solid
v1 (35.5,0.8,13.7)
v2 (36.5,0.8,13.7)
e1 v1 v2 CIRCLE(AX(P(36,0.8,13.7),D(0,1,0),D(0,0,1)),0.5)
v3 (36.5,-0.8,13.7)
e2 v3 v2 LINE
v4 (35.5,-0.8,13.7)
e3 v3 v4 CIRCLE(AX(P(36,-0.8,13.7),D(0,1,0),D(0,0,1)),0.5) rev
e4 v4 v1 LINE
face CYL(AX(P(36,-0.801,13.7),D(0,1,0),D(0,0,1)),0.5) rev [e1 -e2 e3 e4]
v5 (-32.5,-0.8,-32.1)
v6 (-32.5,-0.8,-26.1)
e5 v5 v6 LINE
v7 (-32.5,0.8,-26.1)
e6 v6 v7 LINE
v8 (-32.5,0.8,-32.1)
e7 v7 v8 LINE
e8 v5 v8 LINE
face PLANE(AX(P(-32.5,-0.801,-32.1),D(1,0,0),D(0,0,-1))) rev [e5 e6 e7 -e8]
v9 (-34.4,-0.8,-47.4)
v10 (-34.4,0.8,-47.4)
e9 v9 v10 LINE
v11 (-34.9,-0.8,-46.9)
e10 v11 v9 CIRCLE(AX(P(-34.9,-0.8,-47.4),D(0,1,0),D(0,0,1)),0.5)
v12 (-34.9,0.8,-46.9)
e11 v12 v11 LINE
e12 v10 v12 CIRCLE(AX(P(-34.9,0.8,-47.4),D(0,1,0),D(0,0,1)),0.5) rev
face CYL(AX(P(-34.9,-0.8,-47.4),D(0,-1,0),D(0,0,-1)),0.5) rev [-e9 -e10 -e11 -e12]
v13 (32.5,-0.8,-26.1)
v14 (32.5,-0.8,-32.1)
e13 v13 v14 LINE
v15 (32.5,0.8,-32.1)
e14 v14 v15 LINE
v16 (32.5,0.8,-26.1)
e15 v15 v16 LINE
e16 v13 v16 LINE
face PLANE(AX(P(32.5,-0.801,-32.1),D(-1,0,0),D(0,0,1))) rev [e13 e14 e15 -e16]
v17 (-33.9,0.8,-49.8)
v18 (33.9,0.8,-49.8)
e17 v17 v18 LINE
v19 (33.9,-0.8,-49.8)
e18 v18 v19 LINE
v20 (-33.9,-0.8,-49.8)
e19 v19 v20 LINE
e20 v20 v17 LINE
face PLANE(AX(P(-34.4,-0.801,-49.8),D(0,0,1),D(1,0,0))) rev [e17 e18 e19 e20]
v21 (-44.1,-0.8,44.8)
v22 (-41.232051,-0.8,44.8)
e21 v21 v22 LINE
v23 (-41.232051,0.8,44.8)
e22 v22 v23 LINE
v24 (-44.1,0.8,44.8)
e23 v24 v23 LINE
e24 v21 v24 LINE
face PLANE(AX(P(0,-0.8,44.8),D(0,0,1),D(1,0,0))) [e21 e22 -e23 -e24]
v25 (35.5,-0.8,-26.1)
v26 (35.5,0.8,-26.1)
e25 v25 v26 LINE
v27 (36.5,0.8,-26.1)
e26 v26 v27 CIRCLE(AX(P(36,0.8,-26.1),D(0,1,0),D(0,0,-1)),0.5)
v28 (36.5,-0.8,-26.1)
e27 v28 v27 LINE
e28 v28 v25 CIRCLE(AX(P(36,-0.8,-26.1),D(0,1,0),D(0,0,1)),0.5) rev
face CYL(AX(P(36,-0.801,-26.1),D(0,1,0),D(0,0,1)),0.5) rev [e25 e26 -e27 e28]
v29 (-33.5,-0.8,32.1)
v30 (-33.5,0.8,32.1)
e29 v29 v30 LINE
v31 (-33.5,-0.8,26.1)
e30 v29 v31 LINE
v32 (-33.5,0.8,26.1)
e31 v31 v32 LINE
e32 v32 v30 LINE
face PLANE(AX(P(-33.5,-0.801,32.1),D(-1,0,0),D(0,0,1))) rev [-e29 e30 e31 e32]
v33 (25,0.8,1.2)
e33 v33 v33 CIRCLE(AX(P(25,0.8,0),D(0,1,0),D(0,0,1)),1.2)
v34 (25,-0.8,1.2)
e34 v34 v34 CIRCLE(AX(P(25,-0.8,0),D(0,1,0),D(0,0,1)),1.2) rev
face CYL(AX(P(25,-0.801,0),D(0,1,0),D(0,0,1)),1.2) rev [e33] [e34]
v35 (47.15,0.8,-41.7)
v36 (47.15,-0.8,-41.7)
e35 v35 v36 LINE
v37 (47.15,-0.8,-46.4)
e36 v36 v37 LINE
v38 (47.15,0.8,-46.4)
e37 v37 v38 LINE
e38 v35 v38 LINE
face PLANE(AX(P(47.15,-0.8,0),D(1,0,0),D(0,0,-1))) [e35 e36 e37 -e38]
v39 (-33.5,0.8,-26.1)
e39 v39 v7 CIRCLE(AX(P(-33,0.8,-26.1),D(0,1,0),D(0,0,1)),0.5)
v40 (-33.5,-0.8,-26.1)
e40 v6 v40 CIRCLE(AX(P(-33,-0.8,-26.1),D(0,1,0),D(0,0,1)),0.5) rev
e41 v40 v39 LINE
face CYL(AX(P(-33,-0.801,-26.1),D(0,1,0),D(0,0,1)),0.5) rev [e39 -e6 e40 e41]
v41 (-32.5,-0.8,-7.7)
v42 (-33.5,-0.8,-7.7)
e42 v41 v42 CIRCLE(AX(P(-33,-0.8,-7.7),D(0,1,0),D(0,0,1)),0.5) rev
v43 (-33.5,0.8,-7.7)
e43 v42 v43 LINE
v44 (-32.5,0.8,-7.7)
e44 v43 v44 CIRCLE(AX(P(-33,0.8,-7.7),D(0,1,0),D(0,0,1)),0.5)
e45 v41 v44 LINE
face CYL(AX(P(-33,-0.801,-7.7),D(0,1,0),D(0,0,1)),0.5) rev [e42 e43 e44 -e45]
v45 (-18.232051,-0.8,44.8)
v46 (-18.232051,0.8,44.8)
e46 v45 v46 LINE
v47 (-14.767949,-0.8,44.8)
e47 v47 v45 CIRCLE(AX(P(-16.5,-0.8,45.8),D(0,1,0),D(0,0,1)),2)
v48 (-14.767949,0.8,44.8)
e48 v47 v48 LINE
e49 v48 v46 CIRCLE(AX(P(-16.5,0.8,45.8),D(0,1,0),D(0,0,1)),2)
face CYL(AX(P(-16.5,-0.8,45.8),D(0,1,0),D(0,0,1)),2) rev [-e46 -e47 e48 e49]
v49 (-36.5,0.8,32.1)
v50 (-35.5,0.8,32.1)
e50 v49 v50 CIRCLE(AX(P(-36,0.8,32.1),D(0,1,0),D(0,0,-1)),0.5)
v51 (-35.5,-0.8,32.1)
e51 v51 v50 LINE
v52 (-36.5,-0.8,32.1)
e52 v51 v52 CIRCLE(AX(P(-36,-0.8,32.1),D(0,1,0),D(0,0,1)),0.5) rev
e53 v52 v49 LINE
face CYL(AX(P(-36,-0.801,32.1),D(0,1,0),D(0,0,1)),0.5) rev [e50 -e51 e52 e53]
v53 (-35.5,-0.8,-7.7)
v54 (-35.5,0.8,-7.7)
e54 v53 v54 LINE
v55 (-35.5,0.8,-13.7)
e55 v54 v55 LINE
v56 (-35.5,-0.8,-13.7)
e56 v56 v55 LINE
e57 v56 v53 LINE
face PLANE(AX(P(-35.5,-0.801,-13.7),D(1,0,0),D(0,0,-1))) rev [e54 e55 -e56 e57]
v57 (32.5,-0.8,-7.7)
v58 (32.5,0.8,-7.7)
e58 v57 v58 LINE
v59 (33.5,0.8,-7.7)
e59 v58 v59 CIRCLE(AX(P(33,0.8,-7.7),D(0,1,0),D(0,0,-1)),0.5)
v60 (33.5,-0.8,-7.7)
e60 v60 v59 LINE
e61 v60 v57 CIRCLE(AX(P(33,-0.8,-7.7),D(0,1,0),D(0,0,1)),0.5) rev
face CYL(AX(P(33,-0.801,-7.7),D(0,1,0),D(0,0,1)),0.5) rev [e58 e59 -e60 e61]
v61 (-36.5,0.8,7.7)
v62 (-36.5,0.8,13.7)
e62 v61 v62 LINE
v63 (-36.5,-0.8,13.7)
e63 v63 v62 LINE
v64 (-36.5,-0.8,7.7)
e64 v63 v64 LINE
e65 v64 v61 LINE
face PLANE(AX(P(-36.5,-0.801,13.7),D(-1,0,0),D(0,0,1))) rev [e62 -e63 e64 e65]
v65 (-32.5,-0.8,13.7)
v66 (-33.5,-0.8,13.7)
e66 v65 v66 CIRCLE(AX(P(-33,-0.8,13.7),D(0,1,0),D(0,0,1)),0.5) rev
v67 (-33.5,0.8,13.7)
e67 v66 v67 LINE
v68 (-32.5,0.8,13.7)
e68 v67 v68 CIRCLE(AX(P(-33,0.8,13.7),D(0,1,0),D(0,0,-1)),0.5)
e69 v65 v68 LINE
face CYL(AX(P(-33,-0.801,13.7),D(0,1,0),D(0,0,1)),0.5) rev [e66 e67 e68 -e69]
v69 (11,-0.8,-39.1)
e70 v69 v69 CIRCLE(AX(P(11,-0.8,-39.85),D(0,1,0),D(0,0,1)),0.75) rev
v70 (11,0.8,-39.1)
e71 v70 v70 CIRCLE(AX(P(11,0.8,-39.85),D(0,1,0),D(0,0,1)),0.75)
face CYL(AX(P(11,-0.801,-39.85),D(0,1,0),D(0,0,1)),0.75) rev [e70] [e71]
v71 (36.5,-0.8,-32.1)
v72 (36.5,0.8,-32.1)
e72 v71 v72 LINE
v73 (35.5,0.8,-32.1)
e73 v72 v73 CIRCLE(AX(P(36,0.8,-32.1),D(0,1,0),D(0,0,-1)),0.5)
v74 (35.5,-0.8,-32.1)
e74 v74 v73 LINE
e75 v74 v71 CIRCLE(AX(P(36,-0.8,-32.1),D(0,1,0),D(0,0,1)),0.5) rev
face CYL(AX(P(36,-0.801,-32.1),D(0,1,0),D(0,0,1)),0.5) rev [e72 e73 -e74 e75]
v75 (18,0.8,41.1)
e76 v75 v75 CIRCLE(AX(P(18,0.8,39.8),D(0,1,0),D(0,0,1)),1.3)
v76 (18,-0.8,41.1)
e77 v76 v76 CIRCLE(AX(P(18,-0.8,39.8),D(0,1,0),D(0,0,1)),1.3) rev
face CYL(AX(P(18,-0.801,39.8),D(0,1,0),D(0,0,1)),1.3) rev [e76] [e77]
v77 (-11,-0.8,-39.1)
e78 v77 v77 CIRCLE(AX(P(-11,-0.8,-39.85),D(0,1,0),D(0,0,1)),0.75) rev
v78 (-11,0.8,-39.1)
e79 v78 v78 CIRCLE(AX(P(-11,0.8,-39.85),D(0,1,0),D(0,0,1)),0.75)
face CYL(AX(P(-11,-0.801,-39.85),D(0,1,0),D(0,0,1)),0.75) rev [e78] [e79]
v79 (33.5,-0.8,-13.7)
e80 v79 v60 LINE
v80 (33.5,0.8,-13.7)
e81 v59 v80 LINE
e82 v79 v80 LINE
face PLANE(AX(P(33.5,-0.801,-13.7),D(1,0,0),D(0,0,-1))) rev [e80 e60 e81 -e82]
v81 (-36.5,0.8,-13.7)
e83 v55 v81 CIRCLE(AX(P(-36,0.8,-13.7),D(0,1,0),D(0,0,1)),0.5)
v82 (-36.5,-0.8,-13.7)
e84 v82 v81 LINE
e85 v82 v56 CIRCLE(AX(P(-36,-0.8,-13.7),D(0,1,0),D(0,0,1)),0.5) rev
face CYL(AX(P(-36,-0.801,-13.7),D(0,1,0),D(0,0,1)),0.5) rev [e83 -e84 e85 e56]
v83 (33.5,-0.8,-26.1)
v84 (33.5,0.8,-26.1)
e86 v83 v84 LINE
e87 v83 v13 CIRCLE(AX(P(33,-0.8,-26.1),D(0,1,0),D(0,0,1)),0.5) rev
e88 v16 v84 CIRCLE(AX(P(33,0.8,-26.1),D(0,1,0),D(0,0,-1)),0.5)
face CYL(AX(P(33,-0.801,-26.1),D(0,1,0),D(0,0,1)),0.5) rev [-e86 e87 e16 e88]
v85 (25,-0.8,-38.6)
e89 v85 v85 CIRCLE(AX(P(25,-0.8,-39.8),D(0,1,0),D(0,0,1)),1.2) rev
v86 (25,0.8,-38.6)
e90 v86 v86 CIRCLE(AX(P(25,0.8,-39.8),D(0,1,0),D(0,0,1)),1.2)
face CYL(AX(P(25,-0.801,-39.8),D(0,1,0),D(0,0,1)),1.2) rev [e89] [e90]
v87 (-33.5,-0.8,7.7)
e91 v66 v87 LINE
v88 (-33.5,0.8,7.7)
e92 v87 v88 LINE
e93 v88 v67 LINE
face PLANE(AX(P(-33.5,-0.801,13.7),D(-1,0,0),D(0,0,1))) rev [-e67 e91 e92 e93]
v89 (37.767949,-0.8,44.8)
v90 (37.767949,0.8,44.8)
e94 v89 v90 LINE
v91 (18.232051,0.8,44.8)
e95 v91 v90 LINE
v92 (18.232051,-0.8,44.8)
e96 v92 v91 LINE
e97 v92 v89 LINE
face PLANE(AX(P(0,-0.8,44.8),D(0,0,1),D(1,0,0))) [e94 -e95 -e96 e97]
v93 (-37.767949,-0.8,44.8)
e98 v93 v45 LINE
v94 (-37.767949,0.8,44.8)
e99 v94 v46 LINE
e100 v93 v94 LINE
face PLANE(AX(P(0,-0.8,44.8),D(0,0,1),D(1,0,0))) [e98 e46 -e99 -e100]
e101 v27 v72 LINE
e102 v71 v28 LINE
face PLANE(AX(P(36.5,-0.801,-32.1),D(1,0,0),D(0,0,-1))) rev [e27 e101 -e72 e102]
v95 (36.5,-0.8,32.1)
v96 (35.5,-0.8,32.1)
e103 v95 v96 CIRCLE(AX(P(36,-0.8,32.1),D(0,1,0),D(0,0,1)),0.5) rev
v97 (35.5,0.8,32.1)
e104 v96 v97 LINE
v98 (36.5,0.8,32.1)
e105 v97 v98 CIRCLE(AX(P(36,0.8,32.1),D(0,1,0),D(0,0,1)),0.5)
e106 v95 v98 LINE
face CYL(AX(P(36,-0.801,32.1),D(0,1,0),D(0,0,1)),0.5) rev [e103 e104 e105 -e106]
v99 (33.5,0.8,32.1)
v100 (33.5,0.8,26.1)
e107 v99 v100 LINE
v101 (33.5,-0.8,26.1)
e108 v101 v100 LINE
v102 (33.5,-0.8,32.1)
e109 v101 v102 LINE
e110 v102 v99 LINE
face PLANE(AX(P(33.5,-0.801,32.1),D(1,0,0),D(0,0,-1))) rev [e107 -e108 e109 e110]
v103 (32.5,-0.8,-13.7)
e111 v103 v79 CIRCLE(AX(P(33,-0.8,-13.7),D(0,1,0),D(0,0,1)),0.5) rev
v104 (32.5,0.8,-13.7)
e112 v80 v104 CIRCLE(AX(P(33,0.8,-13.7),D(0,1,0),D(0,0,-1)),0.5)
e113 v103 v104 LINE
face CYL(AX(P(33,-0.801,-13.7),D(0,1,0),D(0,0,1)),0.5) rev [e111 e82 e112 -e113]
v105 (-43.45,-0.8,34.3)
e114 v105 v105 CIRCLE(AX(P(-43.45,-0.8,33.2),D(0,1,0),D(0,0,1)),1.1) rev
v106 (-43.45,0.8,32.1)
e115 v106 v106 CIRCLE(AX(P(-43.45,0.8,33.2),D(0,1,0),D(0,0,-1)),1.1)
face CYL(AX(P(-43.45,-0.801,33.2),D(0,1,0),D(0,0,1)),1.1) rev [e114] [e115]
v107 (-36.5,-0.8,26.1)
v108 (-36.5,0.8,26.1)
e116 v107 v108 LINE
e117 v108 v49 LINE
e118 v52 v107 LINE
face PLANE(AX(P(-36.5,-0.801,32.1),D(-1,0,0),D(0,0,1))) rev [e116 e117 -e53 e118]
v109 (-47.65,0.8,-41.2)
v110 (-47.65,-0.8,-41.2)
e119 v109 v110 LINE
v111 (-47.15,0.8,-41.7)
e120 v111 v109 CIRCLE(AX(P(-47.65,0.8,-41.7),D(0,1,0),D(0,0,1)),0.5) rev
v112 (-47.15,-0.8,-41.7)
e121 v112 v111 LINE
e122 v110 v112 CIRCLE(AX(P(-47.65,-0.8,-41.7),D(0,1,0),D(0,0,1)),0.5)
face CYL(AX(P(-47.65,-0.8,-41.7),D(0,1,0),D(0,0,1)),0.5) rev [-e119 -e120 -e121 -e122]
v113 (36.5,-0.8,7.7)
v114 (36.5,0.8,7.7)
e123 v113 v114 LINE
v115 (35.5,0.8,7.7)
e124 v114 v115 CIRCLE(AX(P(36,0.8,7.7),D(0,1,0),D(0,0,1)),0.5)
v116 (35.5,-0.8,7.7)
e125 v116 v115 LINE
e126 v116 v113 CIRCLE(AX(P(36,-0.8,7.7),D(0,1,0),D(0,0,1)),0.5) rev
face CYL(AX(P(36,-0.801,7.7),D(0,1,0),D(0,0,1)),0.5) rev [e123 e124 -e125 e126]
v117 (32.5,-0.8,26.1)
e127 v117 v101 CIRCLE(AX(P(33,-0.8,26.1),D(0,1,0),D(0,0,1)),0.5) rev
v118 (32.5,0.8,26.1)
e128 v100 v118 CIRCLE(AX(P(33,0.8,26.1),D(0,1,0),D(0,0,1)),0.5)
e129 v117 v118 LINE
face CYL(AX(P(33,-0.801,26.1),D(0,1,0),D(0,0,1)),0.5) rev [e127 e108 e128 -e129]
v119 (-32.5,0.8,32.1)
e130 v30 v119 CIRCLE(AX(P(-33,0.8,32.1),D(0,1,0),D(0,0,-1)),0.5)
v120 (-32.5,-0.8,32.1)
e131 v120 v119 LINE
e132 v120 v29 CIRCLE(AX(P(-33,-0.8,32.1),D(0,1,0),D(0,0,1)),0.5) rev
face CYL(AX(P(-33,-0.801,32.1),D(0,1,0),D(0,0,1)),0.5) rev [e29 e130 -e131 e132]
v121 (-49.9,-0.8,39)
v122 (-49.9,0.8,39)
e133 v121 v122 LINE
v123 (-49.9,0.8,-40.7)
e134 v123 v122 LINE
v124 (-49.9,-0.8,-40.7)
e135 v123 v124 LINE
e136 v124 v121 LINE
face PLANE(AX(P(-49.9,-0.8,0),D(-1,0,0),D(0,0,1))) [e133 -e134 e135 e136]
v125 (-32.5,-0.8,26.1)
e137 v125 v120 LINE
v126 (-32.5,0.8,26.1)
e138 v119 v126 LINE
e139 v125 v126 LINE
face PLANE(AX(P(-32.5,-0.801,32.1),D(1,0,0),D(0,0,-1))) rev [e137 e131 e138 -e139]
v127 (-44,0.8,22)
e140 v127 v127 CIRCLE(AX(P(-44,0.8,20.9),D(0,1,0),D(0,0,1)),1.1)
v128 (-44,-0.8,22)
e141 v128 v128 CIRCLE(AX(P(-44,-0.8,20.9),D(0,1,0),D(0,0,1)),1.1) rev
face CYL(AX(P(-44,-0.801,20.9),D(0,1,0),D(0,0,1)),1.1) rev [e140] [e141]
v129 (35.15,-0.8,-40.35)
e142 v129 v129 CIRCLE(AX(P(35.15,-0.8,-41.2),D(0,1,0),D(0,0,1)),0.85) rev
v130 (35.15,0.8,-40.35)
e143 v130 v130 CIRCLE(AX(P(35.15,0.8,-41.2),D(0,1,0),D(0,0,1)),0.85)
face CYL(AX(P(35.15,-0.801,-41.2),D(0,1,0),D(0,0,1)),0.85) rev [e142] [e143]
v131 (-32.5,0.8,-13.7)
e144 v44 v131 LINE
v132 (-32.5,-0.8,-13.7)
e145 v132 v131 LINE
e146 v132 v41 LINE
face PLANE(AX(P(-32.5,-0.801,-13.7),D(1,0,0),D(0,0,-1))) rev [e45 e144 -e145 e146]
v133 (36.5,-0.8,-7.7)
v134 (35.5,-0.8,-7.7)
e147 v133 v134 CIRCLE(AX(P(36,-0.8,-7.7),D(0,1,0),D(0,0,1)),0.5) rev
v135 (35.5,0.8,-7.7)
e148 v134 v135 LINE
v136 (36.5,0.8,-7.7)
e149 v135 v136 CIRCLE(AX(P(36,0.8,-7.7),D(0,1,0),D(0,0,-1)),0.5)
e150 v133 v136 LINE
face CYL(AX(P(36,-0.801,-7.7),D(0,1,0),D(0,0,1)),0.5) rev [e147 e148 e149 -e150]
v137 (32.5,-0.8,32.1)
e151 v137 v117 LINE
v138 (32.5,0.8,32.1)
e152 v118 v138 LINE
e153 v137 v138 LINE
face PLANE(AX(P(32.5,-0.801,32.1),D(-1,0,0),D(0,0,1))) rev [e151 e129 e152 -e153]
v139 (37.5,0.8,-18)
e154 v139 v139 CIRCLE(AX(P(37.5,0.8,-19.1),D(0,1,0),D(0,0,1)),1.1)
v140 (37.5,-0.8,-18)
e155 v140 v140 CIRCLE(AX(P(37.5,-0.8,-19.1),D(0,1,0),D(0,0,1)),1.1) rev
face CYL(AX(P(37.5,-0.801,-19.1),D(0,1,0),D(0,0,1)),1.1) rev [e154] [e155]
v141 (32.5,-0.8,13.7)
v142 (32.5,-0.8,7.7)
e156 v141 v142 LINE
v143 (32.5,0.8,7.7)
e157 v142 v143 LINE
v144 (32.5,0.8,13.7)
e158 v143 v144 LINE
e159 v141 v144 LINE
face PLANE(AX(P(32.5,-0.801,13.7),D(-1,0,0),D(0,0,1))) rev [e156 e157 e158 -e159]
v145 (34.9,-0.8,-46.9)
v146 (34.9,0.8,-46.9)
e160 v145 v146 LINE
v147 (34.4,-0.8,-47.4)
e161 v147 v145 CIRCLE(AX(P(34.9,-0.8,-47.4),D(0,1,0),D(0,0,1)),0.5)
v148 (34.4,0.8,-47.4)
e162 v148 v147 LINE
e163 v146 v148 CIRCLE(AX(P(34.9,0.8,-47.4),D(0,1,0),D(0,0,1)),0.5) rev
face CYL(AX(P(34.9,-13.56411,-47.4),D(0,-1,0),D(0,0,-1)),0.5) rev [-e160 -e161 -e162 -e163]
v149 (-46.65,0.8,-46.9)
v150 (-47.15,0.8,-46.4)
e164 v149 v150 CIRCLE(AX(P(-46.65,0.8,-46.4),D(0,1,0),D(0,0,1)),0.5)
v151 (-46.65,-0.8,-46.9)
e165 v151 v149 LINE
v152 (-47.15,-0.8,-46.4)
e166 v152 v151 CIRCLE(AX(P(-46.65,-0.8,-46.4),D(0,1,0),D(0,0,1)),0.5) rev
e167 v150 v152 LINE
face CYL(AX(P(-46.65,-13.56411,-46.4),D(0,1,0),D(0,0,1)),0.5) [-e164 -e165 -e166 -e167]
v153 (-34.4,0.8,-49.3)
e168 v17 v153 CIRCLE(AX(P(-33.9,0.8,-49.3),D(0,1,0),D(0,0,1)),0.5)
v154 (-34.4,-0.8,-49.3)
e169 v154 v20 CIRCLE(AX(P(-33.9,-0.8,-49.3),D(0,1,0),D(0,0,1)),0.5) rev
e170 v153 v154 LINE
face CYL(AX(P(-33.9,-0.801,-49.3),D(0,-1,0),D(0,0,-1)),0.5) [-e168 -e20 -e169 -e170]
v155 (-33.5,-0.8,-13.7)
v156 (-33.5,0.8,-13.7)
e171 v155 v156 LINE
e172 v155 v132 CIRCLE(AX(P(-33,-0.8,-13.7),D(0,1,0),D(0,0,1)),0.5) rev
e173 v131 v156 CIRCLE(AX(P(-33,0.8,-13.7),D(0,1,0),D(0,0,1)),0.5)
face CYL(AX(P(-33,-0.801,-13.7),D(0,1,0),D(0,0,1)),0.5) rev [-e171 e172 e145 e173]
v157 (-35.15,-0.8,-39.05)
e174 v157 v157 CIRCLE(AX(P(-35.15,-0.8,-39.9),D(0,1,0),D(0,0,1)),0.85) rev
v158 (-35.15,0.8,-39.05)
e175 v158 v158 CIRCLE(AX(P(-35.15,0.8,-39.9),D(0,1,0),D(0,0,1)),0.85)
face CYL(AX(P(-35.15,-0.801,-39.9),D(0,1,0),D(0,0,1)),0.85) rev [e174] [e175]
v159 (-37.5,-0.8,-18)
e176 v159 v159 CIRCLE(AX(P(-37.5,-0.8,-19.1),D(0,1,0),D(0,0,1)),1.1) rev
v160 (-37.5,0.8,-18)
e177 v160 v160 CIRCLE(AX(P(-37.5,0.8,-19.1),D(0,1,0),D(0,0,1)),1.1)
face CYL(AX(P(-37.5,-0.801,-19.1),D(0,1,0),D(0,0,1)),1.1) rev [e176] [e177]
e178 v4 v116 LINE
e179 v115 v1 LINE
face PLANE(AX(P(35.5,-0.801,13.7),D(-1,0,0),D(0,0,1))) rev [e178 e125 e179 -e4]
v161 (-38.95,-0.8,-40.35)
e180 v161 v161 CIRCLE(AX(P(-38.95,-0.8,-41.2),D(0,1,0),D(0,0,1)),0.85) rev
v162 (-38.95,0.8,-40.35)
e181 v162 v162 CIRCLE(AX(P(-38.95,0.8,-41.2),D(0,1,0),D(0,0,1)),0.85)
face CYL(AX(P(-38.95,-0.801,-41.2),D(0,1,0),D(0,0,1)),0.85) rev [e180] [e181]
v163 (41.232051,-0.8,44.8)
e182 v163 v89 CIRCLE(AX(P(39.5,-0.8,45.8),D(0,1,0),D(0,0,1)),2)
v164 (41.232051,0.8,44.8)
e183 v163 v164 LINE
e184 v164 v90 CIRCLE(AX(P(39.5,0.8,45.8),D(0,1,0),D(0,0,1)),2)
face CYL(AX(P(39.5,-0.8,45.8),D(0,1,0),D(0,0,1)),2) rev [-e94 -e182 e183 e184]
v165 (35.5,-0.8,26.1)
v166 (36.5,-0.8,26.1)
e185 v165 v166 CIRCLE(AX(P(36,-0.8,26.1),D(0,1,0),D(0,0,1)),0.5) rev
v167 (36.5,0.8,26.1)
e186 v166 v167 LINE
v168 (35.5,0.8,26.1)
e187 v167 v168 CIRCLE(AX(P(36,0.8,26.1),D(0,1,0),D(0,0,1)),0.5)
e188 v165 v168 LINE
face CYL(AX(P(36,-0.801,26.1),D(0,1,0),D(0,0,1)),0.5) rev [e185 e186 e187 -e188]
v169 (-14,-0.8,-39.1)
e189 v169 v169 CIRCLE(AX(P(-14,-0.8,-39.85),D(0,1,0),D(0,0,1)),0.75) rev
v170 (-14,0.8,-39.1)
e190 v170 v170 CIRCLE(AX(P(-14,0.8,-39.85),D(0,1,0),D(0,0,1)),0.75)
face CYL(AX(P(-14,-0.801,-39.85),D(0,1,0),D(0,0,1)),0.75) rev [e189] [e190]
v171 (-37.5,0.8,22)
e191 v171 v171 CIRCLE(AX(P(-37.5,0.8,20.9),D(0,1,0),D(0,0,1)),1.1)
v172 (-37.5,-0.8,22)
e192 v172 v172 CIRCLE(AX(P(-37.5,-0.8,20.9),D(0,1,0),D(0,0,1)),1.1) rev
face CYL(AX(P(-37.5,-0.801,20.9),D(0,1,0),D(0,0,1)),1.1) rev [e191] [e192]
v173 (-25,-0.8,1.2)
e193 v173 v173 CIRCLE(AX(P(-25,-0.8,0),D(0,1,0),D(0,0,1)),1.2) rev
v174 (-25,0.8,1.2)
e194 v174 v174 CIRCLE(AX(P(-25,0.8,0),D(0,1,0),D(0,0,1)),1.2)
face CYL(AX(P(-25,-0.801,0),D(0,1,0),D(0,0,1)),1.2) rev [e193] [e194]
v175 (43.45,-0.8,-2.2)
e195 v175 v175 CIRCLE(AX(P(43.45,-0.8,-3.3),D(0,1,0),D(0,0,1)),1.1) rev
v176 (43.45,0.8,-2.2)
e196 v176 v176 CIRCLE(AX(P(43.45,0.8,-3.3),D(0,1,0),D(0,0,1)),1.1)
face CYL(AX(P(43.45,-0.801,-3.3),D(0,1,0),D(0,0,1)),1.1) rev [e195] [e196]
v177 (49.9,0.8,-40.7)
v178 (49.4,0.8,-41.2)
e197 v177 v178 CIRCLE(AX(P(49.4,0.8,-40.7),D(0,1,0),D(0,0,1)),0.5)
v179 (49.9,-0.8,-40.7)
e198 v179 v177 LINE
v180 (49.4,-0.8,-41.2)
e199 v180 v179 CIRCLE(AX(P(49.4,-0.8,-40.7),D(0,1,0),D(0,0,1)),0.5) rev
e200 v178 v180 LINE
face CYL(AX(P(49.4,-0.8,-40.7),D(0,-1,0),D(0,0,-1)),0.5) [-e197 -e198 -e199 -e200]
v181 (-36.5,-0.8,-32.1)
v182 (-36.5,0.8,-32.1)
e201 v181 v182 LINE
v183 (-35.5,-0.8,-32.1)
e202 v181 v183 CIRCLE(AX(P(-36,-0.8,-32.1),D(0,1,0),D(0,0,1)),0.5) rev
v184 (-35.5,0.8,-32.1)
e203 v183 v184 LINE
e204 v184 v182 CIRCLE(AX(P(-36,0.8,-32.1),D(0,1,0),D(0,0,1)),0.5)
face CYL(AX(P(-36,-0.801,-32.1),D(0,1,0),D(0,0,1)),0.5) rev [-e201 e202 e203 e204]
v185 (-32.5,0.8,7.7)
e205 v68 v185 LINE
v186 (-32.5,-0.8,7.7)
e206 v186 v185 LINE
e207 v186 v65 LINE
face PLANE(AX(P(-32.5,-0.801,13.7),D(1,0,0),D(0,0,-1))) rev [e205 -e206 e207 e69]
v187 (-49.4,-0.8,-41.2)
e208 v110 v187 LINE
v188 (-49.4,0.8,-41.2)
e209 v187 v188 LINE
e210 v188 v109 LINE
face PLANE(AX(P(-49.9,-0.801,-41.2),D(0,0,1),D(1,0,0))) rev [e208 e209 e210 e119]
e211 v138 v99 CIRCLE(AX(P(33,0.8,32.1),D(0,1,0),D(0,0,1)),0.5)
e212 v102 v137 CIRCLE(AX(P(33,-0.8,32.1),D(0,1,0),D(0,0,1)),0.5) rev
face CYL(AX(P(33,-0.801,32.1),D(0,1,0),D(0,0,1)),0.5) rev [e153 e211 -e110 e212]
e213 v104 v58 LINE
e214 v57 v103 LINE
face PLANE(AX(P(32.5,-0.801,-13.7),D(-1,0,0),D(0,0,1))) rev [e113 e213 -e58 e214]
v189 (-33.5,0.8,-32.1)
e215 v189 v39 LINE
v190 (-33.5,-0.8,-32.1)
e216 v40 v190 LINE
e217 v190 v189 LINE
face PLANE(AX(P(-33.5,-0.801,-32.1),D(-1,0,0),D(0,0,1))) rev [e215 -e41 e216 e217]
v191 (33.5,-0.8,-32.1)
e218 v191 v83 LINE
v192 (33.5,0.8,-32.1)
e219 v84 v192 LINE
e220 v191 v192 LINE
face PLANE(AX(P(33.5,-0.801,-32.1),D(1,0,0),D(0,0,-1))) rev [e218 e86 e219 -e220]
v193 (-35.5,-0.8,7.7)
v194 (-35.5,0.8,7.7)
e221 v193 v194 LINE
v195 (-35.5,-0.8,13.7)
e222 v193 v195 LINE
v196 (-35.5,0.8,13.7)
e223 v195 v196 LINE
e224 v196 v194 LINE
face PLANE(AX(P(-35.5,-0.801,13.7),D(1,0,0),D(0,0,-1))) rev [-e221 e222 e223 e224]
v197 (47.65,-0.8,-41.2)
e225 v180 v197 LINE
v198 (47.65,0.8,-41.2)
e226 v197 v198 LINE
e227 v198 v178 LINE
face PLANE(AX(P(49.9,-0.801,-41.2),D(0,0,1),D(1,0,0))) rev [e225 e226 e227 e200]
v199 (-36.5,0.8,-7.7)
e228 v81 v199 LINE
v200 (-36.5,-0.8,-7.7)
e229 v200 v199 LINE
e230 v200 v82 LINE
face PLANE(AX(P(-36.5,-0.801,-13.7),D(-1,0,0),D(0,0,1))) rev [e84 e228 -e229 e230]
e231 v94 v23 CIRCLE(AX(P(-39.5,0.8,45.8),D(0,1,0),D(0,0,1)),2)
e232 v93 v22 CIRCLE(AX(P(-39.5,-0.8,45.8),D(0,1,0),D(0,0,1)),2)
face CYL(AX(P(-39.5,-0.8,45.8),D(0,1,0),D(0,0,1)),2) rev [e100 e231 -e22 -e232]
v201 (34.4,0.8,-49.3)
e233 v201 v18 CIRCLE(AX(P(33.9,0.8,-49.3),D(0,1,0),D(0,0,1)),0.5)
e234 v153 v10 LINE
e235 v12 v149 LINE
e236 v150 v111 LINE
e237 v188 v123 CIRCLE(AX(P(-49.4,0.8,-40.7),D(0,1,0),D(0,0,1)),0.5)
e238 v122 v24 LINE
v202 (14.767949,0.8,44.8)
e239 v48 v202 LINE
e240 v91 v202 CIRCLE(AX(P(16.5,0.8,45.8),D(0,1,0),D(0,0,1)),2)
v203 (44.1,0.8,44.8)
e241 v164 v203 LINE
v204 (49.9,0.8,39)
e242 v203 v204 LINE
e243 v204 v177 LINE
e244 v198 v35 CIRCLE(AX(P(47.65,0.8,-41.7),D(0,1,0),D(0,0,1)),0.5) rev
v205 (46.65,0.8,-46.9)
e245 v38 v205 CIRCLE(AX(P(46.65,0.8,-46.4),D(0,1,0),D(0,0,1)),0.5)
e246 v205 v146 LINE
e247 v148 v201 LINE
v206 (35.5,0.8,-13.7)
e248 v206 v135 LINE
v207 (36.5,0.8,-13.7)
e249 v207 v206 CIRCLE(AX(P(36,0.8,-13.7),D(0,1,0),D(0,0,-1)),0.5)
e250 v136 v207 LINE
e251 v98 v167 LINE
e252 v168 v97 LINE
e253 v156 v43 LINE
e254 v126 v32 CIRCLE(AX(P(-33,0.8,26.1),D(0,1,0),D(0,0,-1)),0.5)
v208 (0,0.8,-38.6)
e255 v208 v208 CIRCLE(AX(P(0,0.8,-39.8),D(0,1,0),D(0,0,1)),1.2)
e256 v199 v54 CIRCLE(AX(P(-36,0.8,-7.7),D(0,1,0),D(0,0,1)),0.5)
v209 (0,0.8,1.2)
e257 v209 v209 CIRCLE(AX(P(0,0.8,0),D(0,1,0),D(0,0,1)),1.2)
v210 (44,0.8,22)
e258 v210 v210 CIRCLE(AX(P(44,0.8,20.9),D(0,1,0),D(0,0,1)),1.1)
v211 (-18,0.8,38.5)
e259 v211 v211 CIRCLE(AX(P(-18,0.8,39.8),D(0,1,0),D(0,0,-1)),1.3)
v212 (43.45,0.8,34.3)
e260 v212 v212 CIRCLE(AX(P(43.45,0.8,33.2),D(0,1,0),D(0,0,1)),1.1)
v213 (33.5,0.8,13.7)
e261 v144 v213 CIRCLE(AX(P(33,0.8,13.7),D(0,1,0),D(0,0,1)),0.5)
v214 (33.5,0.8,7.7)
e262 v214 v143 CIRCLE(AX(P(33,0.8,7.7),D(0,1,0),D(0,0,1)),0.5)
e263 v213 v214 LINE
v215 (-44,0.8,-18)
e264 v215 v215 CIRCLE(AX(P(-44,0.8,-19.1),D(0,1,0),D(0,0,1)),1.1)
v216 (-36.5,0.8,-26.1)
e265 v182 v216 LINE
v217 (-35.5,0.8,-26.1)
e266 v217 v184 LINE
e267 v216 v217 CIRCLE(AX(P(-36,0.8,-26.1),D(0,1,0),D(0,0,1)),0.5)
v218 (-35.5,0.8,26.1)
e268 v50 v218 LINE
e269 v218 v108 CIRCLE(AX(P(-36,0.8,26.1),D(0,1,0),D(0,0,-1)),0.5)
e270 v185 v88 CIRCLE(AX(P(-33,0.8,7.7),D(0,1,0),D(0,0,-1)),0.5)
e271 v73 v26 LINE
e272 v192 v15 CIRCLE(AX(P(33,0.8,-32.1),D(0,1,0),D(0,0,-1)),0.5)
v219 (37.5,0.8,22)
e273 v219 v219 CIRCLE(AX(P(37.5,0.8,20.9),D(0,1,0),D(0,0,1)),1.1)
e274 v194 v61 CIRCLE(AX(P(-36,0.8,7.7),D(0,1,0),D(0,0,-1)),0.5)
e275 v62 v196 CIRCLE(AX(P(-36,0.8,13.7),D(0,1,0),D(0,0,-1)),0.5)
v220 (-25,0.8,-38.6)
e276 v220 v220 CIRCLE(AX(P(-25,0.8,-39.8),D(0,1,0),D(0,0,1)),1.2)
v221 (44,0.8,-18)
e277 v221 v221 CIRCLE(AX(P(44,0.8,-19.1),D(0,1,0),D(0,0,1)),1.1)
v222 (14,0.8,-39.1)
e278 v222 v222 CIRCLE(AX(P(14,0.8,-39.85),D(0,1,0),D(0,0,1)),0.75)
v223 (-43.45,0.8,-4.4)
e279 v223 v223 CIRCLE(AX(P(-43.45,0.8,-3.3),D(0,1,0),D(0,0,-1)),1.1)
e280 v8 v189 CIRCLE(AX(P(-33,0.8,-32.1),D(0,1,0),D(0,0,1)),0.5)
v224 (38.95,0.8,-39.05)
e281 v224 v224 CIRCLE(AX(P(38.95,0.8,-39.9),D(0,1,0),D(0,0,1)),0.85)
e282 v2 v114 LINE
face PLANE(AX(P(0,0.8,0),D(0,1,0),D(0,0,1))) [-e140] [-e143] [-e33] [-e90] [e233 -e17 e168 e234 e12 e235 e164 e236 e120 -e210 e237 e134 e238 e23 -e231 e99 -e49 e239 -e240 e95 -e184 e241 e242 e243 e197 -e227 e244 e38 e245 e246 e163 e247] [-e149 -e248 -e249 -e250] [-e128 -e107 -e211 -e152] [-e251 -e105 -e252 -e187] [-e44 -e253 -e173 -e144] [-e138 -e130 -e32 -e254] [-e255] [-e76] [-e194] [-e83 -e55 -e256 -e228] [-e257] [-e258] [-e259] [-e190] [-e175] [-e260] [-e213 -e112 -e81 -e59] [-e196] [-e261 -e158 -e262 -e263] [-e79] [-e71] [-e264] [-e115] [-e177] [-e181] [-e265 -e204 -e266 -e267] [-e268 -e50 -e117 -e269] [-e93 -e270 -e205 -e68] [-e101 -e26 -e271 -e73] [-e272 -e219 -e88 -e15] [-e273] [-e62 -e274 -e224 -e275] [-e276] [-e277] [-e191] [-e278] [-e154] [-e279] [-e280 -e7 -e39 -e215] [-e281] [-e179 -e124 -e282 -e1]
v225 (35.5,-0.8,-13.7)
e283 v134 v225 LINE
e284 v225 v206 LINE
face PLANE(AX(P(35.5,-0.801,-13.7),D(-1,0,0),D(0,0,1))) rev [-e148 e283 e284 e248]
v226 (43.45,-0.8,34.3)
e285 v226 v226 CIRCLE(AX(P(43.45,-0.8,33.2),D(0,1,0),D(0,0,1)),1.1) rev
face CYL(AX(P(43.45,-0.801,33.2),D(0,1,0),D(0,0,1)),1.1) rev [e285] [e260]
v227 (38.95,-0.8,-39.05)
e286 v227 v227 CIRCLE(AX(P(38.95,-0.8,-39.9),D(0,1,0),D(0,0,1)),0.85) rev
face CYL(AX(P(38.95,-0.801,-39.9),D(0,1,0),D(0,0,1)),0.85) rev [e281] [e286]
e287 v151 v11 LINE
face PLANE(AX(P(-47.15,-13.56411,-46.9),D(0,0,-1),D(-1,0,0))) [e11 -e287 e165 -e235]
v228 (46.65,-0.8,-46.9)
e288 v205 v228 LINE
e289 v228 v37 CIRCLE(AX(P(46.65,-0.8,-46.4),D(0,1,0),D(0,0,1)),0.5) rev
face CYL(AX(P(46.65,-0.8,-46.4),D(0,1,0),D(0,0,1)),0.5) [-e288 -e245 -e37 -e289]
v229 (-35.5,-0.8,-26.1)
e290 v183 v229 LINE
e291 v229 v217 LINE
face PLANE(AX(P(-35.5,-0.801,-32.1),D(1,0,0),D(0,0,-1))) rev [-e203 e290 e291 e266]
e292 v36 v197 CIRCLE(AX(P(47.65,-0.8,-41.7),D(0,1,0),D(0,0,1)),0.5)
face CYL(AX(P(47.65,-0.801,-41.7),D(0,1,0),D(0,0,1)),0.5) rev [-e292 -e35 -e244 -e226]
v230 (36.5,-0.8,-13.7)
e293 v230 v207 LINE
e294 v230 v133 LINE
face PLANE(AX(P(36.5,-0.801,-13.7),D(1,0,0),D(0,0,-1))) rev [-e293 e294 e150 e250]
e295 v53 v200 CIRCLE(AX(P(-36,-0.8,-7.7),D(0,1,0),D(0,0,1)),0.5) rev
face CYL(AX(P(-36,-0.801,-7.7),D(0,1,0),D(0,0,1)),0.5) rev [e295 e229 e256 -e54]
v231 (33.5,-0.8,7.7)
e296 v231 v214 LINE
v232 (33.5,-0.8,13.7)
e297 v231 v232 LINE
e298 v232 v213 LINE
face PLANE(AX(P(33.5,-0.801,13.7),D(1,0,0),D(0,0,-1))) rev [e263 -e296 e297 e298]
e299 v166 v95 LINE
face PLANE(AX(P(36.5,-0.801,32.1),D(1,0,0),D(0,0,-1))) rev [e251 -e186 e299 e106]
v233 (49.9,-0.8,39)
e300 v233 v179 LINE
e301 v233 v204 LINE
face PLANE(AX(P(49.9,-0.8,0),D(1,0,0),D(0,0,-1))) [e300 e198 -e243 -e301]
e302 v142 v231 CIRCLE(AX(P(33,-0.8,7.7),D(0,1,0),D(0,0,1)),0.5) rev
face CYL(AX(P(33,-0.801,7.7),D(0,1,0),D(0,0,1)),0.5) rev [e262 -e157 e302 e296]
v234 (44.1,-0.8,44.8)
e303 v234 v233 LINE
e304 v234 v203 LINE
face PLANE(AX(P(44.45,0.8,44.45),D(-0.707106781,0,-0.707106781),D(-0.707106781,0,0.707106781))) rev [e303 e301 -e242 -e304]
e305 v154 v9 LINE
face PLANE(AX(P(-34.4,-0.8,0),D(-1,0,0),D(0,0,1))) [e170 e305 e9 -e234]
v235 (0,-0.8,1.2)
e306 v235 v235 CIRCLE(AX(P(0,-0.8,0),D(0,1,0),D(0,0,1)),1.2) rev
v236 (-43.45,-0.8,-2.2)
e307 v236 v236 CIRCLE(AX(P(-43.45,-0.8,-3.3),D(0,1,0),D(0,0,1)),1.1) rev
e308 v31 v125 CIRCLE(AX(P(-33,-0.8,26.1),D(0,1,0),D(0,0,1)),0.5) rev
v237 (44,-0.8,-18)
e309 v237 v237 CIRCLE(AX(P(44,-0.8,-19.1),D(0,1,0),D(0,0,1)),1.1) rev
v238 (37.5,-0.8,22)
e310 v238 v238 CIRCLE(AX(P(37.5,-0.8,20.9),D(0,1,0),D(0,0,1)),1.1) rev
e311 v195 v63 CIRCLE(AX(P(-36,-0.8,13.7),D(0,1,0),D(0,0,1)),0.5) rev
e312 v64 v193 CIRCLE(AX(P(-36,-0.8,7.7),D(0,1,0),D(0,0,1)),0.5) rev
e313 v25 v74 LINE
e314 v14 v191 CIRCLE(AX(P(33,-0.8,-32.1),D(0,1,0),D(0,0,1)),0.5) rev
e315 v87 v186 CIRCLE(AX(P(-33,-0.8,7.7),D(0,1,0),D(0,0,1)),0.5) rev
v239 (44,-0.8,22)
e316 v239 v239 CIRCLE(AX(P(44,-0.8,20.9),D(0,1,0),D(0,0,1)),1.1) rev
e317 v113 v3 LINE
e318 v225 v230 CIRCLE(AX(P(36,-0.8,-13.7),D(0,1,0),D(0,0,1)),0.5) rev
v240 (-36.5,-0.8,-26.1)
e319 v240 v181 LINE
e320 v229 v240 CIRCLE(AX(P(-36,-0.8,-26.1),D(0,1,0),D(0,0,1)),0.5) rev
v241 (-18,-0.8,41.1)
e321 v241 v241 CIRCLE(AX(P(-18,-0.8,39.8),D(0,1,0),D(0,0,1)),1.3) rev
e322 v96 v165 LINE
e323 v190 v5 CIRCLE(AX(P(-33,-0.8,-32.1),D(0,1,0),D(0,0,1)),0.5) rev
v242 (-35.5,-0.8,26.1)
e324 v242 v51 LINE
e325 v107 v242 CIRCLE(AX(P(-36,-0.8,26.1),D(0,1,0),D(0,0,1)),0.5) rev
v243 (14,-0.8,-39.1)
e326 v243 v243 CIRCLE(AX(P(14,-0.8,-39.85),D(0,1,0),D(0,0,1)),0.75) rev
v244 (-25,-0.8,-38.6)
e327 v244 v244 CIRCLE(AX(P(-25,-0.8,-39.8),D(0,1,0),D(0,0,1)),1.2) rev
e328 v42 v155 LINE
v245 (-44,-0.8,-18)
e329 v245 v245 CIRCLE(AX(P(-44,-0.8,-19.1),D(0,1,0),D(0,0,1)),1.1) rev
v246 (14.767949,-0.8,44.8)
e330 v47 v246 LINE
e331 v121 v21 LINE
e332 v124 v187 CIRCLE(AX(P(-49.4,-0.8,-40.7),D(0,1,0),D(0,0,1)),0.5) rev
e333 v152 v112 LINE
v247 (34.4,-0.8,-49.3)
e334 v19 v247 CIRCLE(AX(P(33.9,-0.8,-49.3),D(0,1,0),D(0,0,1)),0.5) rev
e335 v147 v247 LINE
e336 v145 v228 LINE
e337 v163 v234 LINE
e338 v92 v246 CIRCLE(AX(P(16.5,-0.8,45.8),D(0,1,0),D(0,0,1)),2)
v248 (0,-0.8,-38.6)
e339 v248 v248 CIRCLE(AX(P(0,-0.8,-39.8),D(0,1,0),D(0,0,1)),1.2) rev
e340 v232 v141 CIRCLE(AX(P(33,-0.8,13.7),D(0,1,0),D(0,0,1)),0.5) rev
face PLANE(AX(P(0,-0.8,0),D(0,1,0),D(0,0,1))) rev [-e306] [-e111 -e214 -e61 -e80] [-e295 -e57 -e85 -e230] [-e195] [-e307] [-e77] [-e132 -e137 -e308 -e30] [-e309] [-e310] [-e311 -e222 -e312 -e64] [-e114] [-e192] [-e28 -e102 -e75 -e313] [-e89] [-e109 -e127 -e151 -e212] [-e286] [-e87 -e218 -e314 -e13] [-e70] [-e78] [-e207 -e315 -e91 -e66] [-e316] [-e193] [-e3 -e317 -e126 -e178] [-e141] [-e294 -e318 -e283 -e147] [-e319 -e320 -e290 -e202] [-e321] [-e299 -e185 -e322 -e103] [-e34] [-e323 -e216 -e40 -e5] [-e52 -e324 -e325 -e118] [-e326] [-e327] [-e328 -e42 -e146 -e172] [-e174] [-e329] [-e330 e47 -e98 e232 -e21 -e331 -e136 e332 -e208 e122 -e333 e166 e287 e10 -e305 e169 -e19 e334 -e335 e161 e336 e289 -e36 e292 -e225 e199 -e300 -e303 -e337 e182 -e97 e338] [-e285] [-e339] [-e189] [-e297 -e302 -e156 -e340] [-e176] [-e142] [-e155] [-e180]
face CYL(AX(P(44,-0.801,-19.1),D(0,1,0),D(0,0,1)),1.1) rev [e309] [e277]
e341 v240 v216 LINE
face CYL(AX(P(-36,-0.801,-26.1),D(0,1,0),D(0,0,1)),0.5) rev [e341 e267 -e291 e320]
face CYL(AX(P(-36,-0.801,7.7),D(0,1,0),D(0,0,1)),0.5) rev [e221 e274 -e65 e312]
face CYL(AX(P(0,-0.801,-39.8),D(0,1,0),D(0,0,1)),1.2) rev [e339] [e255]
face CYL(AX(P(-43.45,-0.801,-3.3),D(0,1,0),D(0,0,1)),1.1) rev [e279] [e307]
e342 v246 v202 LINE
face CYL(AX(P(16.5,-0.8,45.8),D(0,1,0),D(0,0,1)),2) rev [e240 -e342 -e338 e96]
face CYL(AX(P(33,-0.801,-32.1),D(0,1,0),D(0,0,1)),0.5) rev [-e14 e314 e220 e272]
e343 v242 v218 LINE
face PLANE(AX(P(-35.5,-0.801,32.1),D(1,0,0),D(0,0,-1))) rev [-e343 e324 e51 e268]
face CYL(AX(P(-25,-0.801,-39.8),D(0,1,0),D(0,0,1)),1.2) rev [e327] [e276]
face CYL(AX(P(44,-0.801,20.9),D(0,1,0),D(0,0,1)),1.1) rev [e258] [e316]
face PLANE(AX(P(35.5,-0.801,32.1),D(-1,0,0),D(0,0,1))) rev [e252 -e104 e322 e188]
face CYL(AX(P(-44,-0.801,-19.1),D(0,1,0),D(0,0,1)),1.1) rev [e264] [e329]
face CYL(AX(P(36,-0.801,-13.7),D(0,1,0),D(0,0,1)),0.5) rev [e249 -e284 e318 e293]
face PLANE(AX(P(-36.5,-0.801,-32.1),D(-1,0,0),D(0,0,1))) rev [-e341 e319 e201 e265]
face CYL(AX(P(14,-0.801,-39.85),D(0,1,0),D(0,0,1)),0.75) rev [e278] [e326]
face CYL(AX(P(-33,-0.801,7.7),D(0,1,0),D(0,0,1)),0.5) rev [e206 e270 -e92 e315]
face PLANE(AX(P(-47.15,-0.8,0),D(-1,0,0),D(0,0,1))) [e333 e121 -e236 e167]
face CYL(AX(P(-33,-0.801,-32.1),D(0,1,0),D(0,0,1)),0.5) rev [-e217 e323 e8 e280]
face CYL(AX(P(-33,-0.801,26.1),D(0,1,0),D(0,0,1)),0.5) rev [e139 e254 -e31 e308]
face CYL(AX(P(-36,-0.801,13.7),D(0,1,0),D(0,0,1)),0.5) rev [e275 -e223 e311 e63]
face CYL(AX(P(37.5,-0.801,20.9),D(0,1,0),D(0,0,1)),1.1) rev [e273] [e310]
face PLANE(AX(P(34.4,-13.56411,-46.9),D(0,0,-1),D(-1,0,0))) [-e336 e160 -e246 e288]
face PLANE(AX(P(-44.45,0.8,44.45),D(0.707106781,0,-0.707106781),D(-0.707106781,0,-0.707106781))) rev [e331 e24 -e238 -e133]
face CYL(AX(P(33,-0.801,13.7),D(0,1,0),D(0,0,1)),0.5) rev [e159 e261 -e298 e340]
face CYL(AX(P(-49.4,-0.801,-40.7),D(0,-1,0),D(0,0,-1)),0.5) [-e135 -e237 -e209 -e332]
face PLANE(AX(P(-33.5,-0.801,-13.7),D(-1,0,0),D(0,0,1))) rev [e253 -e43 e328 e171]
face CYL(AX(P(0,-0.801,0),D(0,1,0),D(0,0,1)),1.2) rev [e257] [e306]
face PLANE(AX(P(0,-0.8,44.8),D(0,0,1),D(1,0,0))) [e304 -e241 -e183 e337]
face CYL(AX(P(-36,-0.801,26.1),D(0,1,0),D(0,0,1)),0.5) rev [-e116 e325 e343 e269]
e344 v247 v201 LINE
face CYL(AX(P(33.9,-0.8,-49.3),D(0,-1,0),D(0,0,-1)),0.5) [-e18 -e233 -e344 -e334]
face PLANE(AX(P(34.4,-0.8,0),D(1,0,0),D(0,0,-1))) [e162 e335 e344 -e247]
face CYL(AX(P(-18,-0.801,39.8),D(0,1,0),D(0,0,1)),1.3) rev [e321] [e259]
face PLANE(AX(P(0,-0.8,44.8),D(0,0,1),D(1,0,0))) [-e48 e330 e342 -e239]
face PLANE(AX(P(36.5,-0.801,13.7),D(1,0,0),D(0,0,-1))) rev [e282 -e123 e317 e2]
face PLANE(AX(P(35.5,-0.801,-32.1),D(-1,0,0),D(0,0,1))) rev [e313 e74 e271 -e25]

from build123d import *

# Parameters (mm, degrees)
GENERICCARDPCBDEFINITION_START = -0.8
GENERICCARDPCBDEFINITION_DEPTH = 1.6
SKETCH7_R                      = 1.1
SKETCH7_R_2                    = 1.2
SKETCH7_R_3                    = 1.3
SKETCH7_R_4                    = 0.85
SKETCH7_R_5                    = 0.75
CUT_EXTRUDE1_DEPTH             = 1.6


# Read off the part's stored shape, not the designer's step: GenericCardPCBDefinition
with BuildPart() as part:
    # GenericCardPCBDefinition outline → GenericCardPCBDefinition (new body)
    with BuildSketch(Plane(origin=(0, 0, 0), x_dir=(1, 0, 0), z_dir=(0, 1, 0)).offset(GENERICCARDPCBDEFINITION_START)):
        with BuildLine():
            Line((-49.9, -39), (-44.1, -44.8))
            Line((-44.1, -44.8), (-41.232050808, -44.8))
            ThreePointArc((-41.232050808, -44.8), (-39.5, -43.8), (-37.767949192, -44.8))
            Line((-37.767949192, -44.8), (-18.232050808, -44.8))
            ThreePointArc((-18.232050808, -44.8), (-16.5, -43.8), (-14.767949192, -44.8))
            Line((-14.767949192, -44.8), (14.767949192, -44.8))
            ThreePointArc((14.767949192, -44.8), (16.5, -43.8), (18.232050808, -44.8))
            Line((18.232050808, -44.8), (37.767949192, -44.8))
            ThreePointArc((37.767949192, -44.8), (39.5, -43.8), (41.232050808, -44.8))
            Line((41.232050808, -44.8), (44.1, -44.8))
            Line((44.1, -44.8), (49.9, -39))
            Line((49.9, -39), (49.9, 40.7))
            ThreePointArc((49.9, 40.7), (49.753553391, 41.053553391), (49.4, 41.2))
            Line((49.4, 41.2), (47.65, 41.2))
            ThreePointArc((47.65, 41.2), (47.296446609, 41.346446609), (47.15, 41.7))
            Line((47.15, 41.7), (47.15, 46.4))
            ThreePointArc((47.15, 46.4), (47.003553391, 46.753553391), (46.65, 46.9))
            Line((46.65, 46.9), (34.9, 46.9))
            ThreePointArc((34.9, 46.9), (34.546446609, 47.046446609), (34.4, 47.4))
            Line((34.4, 47.4), (34.4, 49.3))
            ThreePointArc((34.4, 49.3), (34.253553391, 49.653553391), (33.9, 49.8))
            Line((33.9, 49.8), (-33.9, 49.8))
            ThreePointArc((-33.9, 49.8), (-34.253553391, 49.653553391), (-34.4, 49.3))
            Line((-34.4, 49.3), (-34.4, 47.4))
            ThreePointArc((-34.4, 47.4), (-34.546446609, 47.046446609), (-34.9, 46.9))
            Line((-34.9, 46.9), (-46.65, 46.9))
            ThreePointArc((-46.65, 46.9), (-47.003553391, 46.753553391), (-47.15, 46.4))
            Line((-47.15, 46.4), (-47.15, 41.7))
            ThreePointArc((-47.15, 41.7), (-47.296446609, 41.346446609), (-47.65, 41.2))
            Line((-47.65, 41.2), (-49.4, 41.2))
            ThreePointArc((-49.4, 41.2), (-49.753553391, 41.053553391), (-49.9, 40.7))
            Line((-49.9, 40.7), (-49.9, -39))
        make_face()
    extrude(amount=GENERICCARDPCBDEFINITION_DEPTH)

    # Sketch7 → Cut-Extrude1 (cut)
    with BuildSketch(Plane(origin=(0, 0.8, 0), x_dir=(1, 0, 0), z_dir=(0, 1, 0))):
        with Locations(Location((-37.5, -20.899999999, 0), (0, 0, 270))):
            Circle(SKETCH7_R)
        with Locations(Location((-44, -20.899999999, 0), (0, 0, 270))):
            Circle(SKETCH7_R)
        with Locations(Location((25, 0, 0), (0, 0, 270))):
            Circle(SKETCH7_R_2)
        with Locations(Location((0, 0, 0), (0, 0, 270))):
            Circle(SKETCH7_R_2)
        with Locations(Location((-25, 0, 0), (0, 0, 270))):
            Circle(SKETCH7_R_2)
        with Locations(Location((0, 39.8, 0), (0, 0, 270))):
            Circle(SKETCH7_R_2)
        with Locations(Location((-25, 39.8, 0), (0, 0, 270))):
            Circle(SKETCH7_R_2)
        with Locations(Location((25, 39.8, 0), (0, 0, 270))):
            Circle(SKETCH7_R_2)
        with Locations(Location((18, -39.8, 0), (0, 0, 270))):
            Circle(SKETCH7_R_3)
        with Locations(Location((-18, -39.8, 0), (0, 0, 270))):
            Circle(SKETCH7_R_3)
        with Locations(Location((-37.5, 19.1, 0), (0, 0, 270))):
            Circle(SKETCH7_R)
        with Locations(Location((-44, 19.1, 0), (0, 0, 270))):
            Circle(SKETCH7_R)
        with Locations(Location((44, 19.1, 0), (0, 0, 270))):
            Circle(SKETCH7_R)
        with Locations(Location((37.5, 19.1, 0), (0, 0, 270))):
            Circle(SKETCH7_R)
        with Locations(Location((43.45, 3.3, 0), (0, 0, 270))):
            Circle(SKETCH7_R)
        with Locations(Location((37.5, -20.899999999, 0), (0, 0, 270))):
            Circle(SKETCH7_R)
        with Locations(Location((44, -20.899999999, 0), (0, 0, 270))):
            Circle(SKETCH7_R)
        with Locations(Location((43.45, -33.2, 0), (0, 0, 270))):
            Circle(SKETCH7_R)
        with Locations(Location((38.95, 39.9, 0), (0, 0, 270))):
            Circle(SKETCH7_R_4)
        with Locations(Location((35.15, 41.2, 0), (0, 0, 270))):
            Circle(SKETCH7_R_4)
        with Locations(Location((-35.15, 39.9, 0), (0, 0, 270))):
            Circle(SKETCH7_R_4)
        with Locations(Location((-38.95, 41.2, 0), (0, 0, 270))):
            Circle(SKETCH7_R_4)
        with Locations(Location((14, 39.85, 0), (0, 0, 270))):
            Circle(SKETCH7_R_5)
        with Locations(Location((11, 39.85, 0), (0, 0, 270))):
            Circle(SKETCH7_R_5)
        with Locations(Location((-11, 39.85, 0), (0, 0, 270))):
            Circle(SKETCH7_R_5)
        with Locations(Location((-14, 39.85, 0), (0, 0, 270))):
            Circle(SKETCH7_R_5)
        with Locations(Location((-43.45, 3.3, 0), (0, 0, 270))):
            Circle(SKETCH7_R)
        with Locations(Location((-43.45, -33.2, 0), (0, 0, 270))):
            Circle(SKETCH7_R)
        with BuildLine():
            Line((32.5, -32.1), (32.5, -26.1))
            ThreePointArc((32.5, -26.1), (33, -25.6), (33.5, -26.1))
            Line((33.5, -26.1), (33.5, -32.1))
            ThreePointArc((33.5, -32.1), (33, -32.6), (32.5, -32.1))
        make_face()
        with BuildLine():
            Line((35.5, -32.1), (35.5, -26.1))
            ThreePointArc((35.5, -26.1), (36, -25.6), (36.5, -26.1))
            Line((36.5, -26.1), (36.5, -32.1))
            ThreePointArc((36.5, -32.1), (36, -32.6), (35.5, -32.1))
        make_face()
        with BuildLine():
            Line((35.5, -13.7), (35.5, -7.7))
            ThreePointArc((35.5, -7.7), (36, -7.2), (36.5, -7.7))
            Line((36.5, -7.7), (36.5, -13.7))
            ThreePointArc((36.5, -13.7), (36, -14.2), (35.5, -13.7))
        make_face()
        with BuildLine():
            Line((32.5, -13.7), (32.5, -7.7))
            ThreePointArc((32.5, -7.7), (33, -7.2), (33.5, -7.7))
            Line((33.5, -7.7), (33.5, -13.7))
            ThreePointArc((33.5, -13.7), (33, -14.2), (32.5, -13.7))
        make_face()
        with BuildLine():
            Line((32.5, 32.1), (32.5, 26.1))
            ThreePointArc((32.5, 26.1), (33, 25.6), (33.5, 26.1))
            Line((33.5, 26.1), (33.5, 32.1))
            ThreePointArc((33.5, 32.1), (33, 32.6), (32.5, 32.1))
        make_face()
        with BuildLine():
            Line((35.5, 32.1), (35.5, 26.1))
            ThreePointArc((35.5, 26.1), (36, 25.6), (36.5, 26.1))
            Line((36.5, 26.1), (36.5, 32.1))
            ThreePointArc((36.5, 32.1), (36, 32.6), (35.5, 32.1))
        make_face()
        with BuildLine():
            Line((35.5, 13.7), (35.5, 7.7))
            ThreePointArc((35.5, 7.7), (36, 7.2), (36.5, 7.7))
            Line((36.5, 7.7), (36.5, 13.7))
            ThreePointArc((36.5, 13.7), (36, 14.2), (35.5, 13.7))
        make_face()
        with BuildLine():
            Line((32.5, 13.7), (32.5, 7.7))
            ThreePointArc((32.5, 7.7), (33, 7.2), (33.5, 7.7))
            Line((33.5, 7.7), (33.5, 13.7))
            ThreePointArc((33.5, 13.7), (33, 14.2), (32.5, 13.7))
        make_face()
        with BuildLine():
            Line((-32.5, 13.7), (-32.5, 7.7))
            ThreePointArc((-32.5, 7.7), (-33, 7.2), (-33.5, 7.7))
            Line((-33.5, 7.7), (-33.5, 13.7))
            ThreePointArc((-33.5, 13.7), (-33, 14.2), (-32.5, 13.7))
        make_face()
        with BuildLine():
            Line((-35.5, 13.7), (-35.5, 7.7))
            ThreePointArc((-35.5, 7.7), (-36, 7.2), (-36.5, 7.7))
            Line((-36.5, 7.7), (-36.5, 13.7))
            ThreePointArc((-36.5, 13.7), (-36, 14.2), (-35.5, 13.7))
        make_face()
        with BuildLine():
            Line((-35.5, 32.1), (-35.5, 26.1))
            ThreePointArc((-35.5, 26.1), (-36, 25.6), (-36.5, 26.1))
            Line((-36.5, 26.1), (-36.5, 32.1))
            ThreePointArc((-36.5, 32.1), (-36, 32.6), (-35.5, 32.1))
        make_face()
        with BuildLine():
            Line((-32.5, 32.1), (-32.5, 26.1))
            ThreePointArc((-32.5, 26.1), (-33, 25.6), (-33.5, 26.1))
            Line((-33.5, 26.1), (-33.5, 32.1))
            ThreePointArc((-33.5, 32.1), (-33, 32.6), (-32.5, 32.1))
        make_face()
        with BuildLine():
            Line((-32.5, -13.7), (-32.5, -7.7))
            ThreePointArc((-32.5, -7.7), (-33, -7.2), (-33.5, -7.7))
            Line((-33.5, -7.7), (-33.5, -13.7))
            ThreePointArc((-33.5, -13.7), (-33, -14.2), (-32.5, -13.7))
        make_face()
        with BuildLine():
            Line((-35.5, -13.7), (-35.5, -7.7))
            ThreePointArc((-35.5, -7.7), (-36, -7.2), (-36.5, -7.7))
            Line((-36.5, -7.7), (-36.5, -13.7))
            ThreePointArc((-36.5, -13.7), (-36, -14.2), (-35.5, -13.7))
        make_face()
        with BuildLine():
            Line((-35.5, -32.1), (-35.5, -26.1))
            ThreePointArc((-35.5, -26.1), (-36, -25.6), (-36.5, -26.1))
            Line((-36.5, -26.1), (-36.5, -32.1))
            ThreePointArc((-36.5, -32.1), (-36, -32.6), (-35.5, -32.1))
        make_face()
        with BuildLine():
            Line((-32.5, -32.1), (-32.5, -26.1))
            ThreePointArc((-32.5, -26.1), (-33, -25.6), (-33.5, -26.1))
            Line((-33.5, -26.1), (-33.5, -32.1))
            ThreePointArc((-33.5, -32.1), (-33, -32.6), (-32.5, -32.1))
        make_face()
    extrude(amount=-CUT_EXTRUDE1_DEPTH, mode=Mode.SUBTRACT)


solid = part.part
